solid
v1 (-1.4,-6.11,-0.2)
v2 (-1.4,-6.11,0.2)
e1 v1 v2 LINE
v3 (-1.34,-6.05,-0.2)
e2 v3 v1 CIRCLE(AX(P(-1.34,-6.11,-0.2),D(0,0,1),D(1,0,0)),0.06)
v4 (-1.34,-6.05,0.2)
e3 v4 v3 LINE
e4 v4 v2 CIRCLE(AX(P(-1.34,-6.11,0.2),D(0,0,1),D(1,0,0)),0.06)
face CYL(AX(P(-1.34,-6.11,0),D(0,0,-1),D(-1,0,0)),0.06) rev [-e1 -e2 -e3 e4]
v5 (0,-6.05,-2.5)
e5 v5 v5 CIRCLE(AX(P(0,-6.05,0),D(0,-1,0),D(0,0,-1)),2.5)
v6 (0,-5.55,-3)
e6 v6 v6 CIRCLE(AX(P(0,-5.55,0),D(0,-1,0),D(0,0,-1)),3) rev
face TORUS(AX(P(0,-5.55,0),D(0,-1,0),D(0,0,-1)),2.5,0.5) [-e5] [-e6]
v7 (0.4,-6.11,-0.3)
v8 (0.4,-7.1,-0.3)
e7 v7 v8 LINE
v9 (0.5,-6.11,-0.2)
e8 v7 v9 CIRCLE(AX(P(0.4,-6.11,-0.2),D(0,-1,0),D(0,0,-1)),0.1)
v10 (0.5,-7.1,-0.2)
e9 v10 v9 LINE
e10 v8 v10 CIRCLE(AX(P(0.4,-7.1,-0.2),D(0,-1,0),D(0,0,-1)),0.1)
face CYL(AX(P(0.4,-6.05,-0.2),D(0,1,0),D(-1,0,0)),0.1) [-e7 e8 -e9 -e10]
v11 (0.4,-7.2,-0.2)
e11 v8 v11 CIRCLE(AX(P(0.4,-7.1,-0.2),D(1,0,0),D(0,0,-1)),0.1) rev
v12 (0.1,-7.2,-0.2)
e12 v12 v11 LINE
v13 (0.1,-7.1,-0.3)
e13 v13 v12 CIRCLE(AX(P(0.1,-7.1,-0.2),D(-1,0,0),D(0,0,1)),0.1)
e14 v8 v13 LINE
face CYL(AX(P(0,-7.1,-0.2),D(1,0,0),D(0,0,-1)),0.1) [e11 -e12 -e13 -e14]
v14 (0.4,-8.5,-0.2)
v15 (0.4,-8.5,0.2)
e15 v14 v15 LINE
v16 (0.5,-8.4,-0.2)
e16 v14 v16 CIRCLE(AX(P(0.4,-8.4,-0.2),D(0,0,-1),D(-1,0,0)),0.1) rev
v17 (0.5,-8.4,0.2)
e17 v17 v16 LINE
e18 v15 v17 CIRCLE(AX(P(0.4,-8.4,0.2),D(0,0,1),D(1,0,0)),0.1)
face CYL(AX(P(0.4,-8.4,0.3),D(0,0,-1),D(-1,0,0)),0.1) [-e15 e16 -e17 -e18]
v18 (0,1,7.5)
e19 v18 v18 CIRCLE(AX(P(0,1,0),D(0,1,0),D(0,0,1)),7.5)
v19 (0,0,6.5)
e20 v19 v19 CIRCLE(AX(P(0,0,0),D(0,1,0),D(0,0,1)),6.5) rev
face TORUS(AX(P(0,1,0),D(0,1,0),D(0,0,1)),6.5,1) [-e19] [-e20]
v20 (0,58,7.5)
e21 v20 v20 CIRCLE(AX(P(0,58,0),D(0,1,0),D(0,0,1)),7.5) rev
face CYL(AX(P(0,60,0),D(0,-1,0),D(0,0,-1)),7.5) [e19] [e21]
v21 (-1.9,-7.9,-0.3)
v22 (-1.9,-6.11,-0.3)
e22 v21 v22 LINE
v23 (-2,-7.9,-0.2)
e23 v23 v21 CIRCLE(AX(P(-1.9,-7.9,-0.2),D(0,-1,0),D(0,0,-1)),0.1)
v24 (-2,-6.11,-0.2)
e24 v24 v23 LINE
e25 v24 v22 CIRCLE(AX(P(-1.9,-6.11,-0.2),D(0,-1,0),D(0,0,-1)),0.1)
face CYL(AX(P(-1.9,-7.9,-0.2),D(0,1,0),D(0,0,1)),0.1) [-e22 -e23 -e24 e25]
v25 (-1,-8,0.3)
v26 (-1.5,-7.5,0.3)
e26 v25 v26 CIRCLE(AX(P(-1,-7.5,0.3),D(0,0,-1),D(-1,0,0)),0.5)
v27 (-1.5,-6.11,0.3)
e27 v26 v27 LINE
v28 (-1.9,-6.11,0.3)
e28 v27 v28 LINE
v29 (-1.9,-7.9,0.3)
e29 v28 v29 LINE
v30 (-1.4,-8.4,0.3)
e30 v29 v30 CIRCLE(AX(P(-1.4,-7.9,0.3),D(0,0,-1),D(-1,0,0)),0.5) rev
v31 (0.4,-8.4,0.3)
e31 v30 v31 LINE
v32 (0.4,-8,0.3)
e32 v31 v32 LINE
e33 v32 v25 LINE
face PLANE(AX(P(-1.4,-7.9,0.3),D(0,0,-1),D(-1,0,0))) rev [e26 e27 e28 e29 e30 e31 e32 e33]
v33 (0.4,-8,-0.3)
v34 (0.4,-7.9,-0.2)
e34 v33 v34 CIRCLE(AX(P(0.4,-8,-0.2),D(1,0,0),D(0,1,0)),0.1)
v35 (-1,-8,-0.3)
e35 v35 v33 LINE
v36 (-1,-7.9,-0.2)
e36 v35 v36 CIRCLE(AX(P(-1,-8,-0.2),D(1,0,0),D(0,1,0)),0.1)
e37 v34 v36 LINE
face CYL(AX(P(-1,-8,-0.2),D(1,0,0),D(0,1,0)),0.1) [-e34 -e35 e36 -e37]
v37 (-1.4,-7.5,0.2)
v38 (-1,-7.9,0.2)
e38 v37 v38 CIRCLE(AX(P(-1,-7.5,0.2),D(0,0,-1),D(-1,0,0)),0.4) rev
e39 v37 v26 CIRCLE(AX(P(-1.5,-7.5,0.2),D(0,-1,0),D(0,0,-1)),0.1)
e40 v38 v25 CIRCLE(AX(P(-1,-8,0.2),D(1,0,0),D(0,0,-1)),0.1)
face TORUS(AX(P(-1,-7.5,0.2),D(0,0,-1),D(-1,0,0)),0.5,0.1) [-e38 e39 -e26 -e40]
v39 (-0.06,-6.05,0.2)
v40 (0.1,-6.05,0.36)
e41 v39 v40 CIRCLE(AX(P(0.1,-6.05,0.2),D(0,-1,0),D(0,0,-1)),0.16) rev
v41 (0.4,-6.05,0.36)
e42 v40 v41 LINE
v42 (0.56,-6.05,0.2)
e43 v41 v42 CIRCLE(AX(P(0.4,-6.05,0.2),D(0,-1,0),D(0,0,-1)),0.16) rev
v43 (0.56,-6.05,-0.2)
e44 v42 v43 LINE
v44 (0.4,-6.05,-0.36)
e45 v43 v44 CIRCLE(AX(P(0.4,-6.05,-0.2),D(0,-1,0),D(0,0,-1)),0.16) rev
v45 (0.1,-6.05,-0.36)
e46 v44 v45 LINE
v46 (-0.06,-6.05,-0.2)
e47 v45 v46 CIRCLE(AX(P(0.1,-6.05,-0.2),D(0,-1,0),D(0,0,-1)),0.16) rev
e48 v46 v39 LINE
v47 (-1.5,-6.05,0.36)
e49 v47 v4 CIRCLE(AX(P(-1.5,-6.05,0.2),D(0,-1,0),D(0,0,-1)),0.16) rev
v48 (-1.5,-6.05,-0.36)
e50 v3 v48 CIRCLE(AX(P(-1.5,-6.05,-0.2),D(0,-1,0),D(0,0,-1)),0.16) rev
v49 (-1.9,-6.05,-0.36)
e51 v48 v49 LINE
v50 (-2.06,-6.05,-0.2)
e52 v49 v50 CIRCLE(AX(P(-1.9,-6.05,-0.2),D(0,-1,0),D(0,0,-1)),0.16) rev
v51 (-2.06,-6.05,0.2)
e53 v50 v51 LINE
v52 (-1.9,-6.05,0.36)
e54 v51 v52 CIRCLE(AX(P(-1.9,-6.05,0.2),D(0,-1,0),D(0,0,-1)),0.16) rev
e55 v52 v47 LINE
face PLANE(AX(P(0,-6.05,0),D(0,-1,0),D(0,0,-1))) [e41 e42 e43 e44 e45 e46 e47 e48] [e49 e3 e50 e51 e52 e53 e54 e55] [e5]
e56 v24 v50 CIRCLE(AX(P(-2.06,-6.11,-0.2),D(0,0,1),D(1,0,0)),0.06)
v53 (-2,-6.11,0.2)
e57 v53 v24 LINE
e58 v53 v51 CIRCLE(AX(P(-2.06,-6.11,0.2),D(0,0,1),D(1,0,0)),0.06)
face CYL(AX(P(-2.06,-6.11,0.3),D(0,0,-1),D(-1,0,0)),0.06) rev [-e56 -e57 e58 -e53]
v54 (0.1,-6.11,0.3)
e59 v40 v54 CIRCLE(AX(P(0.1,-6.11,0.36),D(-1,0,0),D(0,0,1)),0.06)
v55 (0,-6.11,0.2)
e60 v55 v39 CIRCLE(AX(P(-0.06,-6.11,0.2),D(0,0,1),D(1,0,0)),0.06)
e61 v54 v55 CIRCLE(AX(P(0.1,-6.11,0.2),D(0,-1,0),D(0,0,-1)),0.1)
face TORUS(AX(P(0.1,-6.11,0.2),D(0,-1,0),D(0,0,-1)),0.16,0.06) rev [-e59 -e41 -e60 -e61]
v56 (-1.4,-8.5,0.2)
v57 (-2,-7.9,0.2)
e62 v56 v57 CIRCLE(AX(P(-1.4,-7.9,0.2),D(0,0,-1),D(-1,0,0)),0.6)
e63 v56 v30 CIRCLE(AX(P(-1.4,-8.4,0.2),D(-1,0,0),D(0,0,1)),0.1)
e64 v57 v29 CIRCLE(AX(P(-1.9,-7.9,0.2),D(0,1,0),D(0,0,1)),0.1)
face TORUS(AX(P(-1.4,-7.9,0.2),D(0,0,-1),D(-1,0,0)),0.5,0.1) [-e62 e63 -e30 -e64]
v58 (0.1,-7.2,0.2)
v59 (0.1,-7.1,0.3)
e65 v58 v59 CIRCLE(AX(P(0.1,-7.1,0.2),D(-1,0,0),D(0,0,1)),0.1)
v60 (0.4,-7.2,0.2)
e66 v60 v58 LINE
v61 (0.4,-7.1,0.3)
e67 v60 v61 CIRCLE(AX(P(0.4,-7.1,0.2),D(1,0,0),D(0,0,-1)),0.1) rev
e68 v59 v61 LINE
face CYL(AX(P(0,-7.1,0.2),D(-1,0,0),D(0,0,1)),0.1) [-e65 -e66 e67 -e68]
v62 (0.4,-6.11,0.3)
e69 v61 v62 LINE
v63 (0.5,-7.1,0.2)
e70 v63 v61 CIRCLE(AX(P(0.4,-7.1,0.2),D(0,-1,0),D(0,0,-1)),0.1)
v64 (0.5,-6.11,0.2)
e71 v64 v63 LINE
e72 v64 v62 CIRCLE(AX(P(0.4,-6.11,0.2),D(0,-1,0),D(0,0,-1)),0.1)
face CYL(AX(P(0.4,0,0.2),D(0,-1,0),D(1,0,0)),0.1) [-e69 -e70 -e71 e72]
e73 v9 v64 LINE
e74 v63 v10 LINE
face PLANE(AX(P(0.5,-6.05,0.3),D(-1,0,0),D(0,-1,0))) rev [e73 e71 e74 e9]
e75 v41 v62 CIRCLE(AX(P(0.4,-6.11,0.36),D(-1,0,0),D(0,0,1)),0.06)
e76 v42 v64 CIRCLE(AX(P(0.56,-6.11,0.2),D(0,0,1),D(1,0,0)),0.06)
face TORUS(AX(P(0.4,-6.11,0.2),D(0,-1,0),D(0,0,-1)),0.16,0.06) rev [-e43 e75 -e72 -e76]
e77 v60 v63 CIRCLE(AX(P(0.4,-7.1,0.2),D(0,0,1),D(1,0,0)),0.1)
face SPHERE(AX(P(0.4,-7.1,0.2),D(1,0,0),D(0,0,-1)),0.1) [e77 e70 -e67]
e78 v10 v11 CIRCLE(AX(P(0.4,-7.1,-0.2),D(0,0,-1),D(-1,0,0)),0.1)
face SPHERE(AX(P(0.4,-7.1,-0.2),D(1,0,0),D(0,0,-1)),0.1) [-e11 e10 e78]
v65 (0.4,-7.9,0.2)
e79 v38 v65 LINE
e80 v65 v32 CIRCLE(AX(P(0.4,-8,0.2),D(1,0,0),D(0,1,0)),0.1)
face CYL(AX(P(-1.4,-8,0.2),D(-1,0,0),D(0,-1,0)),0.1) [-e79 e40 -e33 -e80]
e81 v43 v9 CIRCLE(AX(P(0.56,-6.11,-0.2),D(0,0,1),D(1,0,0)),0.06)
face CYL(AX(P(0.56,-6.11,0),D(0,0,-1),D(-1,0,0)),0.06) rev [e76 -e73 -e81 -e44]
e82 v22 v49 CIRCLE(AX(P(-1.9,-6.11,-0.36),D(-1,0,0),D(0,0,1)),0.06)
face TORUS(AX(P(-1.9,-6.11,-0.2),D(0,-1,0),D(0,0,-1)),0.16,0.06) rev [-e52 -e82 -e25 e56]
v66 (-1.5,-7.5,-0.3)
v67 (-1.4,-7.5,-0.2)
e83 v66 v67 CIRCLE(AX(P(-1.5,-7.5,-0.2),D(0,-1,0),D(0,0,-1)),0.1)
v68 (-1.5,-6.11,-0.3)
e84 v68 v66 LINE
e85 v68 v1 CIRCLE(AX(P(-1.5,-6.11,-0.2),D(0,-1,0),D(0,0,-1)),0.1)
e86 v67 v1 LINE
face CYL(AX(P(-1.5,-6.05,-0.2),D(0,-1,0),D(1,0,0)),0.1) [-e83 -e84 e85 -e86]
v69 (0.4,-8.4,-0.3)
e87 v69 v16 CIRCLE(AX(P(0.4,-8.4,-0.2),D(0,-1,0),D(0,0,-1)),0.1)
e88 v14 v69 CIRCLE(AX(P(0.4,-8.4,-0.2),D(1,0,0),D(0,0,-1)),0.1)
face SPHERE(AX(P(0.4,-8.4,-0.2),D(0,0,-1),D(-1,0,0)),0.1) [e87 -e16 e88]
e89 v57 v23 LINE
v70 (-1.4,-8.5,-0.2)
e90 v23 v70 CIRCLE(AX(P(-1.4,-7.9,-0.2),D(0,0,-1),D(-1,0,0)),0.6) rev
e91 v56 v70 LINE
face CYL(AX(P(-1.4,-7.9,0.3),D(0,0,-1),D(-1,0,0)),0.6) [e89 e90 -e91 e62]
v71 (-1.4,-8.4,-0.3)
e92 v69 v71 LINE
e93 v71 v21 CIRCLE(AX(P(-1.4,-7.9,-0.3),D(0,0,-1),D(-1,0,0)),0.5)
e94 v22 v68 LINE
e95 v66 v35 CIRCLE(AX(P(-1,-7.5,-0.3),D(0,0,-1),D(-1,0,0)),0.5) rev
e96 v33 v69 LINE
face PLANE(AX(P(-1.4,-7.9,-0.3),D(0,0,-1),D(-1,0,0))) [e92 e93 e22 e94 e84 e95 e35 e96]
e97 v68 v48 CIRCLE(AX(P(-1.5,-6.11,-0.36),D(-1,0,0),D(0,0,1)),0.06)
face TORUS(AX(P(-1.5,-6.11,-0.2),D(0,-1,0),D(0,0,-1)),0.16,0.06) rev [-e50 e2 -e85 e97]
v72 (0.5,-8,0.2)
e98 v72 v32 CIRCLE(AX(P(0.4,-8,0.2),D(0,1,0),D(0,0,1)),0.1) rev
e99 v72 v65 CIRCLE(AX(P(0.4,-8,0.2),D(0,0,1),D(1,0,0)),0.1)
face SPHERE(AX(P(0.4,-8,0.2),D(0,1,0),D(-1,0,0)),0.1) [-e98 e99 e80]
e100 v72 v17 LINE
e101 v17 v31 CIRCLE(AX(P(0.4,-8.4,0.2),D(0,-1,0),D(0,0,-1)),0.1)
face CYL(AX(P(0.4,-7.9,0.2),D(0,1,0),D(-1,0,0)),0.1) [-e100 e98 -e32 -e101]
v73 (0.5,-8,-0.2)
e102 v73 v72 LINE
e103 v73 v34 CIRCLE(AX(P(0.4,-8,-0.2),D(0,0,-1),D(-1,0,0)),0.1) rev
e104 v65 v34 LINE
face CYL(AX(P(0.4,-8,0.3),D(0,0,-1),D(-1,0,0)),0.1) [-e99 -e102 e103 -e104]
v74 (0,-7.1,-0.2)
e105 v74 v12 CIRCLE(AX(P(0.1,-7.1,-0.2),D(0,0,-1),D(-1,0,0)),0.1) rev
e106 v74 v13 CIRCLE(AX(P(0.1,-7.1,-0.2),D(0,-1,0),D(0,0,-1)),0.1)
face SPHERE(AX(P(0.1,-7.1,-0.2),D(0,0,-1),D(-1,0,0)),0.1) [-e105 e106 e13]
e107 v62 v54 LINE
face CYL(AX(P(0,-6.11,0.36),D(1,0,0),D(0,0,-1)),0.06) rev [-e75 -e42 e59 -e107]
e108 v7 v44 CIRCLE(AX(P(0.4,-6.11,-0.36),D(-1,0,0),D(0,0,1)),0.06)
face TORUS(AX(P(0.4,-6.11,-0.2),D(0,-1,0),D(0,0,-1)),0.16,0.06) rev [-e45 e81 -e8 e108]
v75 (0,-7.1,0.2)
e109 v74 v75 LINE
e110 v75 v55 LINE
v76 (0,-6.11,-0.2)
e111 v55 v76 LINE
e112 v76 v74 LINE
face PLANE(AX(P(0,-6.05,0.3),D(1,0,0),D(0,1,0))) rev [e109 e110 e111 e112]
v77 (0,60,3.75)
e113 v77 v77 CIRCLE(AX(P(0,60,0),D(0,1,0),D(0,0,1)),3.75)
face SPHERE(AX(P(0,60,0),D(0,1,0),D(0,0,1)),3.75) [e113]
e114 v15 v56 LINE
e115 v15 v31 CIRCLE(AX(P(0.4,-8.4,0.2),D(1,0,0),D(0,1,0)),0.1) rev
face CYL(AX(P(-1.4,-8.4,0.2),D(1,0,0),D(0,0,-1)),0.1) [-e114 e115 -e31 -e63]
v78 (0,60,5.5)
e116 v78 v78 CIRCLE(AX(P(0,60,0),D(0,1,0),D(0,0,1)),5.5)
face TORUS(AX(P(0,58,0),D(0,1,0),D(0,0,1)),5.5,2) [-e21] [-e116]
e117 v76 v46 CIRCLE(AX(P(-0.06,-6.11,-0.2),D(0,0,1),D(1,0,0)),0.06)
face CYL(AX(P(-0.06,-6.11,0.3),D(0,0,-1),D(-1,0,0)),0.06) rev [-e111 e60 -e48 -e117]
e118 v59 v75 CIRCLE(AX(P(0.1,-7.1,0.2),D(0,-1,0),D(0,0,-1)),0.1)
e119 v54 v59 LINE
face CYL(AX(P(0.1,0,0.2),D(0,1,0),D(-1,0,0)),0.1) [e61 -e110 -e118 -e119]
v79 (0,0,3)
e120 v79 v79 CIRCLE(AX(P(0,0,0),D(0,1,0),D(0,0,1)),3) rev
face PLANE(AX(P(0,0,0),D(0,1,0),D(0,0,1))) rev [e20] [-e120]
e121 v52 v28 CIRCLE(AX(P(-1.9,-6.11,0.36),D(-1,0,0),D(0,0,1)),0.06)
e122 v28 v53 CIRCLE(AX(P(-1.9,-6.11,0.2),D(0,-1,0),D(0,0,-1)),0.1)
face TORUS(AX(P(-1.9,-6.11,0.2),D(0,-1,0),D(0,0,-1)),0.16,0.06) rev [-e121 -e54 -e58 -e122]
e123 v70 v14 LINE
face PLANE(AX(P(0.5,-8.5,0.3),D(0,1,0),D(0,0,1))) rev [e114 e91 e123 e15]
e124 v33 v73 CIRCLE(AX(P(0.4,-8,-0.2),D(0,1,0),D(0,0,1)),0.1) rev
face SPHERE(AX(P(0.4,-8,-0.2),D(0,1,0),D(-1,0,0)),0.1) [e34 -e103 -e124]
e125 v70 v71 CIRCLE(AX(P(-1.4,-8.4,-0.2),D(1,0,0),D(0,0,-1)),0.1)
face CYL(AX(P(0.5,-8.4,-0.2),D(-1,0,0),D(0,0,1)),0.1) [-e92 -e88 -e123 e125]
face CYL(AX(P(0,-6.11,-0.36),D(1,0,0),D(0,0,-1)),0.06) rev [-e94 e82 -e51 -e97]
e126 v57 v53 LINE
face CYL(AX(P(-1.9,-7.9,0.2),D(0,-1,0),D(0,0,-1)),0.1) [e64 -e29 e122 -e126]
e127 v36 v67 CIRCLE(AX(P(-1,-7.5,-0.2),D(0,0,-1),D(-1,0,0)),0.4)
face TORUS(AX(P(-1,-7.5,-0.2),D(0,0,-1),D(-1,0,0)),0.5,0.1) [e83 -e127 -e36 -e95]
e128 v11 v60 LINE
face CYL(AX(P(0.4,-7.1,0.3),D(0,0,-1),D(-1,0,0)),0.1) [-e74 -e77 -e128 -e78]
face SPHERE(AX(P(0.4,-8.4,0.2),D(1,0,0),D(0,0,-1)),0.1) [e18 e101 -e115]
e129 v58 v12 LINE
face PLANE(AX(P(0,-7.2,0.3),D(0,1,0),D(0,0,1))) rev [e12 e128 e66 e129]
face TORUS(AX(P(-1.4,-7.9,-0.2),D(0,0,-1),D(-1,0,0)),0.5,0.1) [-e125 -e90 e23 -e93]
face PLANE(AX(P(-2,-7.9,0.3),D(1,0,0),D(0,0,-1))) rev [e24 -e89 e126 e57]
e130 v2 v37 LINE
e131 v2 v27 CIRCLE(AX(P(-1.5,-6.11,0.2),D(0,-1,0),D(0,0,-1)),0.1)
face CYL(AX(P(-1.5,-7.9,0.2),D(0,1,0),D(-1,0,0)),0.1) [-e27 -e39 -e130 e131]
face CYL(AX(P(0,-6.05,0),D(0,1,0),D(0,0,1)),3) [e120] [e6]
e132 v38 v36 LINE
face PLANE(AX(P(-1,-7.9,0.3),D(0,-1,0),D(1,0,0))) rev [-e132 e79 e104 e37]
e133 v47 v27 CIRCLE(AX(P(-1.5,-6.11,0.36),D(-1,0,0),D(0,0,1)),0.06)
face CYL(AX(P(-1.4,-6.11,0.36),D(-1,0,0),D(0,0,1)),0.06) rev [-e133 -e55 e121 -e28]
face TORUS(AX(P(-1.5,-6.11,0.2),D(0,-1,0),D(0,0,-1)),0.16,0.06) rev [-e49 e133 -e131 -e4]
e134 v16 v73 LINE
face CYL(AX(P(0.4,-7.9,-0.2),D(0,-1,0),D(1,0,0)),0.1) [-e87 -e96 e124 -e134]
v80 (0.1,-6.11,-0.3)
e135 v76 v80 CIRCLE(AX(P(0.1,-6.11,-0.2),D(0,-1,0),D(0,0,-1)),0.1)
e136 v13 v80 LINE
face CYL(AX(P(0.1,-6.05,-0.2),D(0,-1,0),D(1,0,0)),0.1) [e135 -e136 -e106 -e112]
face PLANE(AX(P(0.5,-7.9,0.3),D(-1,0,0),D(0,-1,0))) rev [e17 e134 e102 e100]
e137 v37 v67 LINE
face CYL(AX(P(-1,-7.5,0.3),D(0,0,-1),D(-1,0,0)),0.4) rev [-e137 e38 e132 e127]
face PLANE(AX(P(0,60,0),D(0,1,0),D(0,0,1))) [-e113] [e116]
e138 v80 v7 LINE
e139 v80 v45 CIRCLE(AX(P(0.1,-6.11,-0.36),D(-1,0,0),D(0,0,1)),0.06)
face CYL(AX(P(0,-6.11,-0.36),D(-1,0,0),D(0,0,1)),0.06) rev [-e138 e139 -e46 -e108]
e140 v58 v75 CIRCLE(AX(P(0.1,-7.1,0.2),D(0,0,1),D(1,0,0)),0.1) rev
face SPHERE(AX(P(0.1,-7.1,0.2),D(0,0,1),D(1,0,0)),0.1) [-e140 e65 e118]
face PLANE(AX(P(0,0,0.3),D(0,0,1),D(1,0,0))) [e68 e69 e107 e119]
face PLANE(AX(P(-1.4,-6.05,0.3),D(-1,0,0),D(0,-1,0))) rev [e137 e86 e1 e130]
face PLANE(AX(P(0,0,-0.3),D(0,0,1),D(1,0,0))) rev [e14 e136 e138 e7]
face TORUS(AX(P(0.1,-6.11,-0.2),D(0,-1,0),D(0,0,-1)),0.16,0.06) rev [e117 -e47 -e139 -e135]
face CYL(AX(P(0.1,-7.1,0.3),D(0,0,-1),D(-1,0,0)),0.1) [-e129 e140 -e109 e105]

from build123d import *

# Parameters (mm, degrees)
SKETCH1_R           = 7.5
BOSS_EXTRUDE1_DEPTH = 60
SKETCH2_R           = 3.75
BOSS_EXTRUDE2_DEPTH = 3.75
FILLET1_R           = 3.75
FILLET2_R           = 2
FILLET3_R           = 1
SKETCH3_R           = 3
BOSS_EXTRUDE3_DEPTH = 6.05
FILLET4_R           = 0.5
SKETCH4_W           = 0.5
SKETCH4_H           = 1.15
BOSS_EXTRUDE4_DEPTH = 0.3
FILLET5_R           = 0.1
FILLET6_R           = 0.06


with BuildPart() as part:
    # Sketch1 → Boss-Extrude1 (new body)
    with BuildSketch(Plane(origin=(0, 0, 0), x_dir=(1, 0, 0), z_dir=(0, 1, 0))):
        with Locations(Location((0, 0, 0), (0, 0, 270))):
            Circle(SKETCH1_R)
    extrude(amount=BOSS_EXTRUDE1_DEPTH)

    # Sketch2 → Boss-Extrude2 (add)
    with BuildSketch(Plane(origin=(0, 60, 0), x_dir=(1, 0, 0), z_dir=(0, 1, 0))):
        with Locations(Location((0, 0, 0), (0, 0, 270))):
            Circle(SKETCH2_R)
    extrude(amount=BOSS_EXTRUDE2_DEPTH)

    # Fillet1
    fillet1_edges = [part.edges().sort_by_distance(p)[0] for p in [
        (0, 63.75, -3.75),
    ]]
    fillet(fillet1_edges, radius=FILLET1_R - 0.0001)  # a hair under: the kernel refuses the full size

    # Fillet2
    fillet2_edges = [part.edges().sort_by_distance(p)[0] for p in [
        (0, 60, -7.5),
    ]]
    fillet(fillet2_edges, radius=FILLET2_R)

    # Fillet3
    fillet3_edges = [part.edges().sort_by_distance(p)[0] for p in [
        (0, 0, -7.5),
    ]]
    fillet(fillet3_edges, radius=FILLET3_R)

    # Sketch3 → Boss-Extrude3 (add)
    with BuildSketch(Plane.XZ):
        with Locations(Location((0, 0, 0), (0, 0, 90))):
            Circle(SKETCH3_R)
    extrude(amount=BOSS_EXTRUDE3_DEPTH)

    # Fillet4
    fillet4_edges = [part.edges().sort_by_distance(p)[0] for p in [
        (0, -6.05, -3),
    ]]
    fillet(fillet4_edges, radius=FILLET4_R)

    # Sketch4 → Boss-Extrude4 (add, symmetric)
    with BuildSketch(Plane.XY):
        with Locations((0.25, -6.625)):
            Rectangle(SKETCH4_W, SKETCH4_H)
        with BuildLine():
            Line((0.5, -8.5), (-1.4, -8.5))
            ThreePointArc((-1.4, -8.5), (-1.824264069, -8.324264069), (-2, -7.9))
            Line((-2, -7.9), (-2, -6.05))
            Line((-2, -6.05), (-1.4, -6.05))
            Line((-1.4, -6.05), (-1.4, -7.5))
            ThreePointArc((-1.4, -7.5), (-1.282842712, -7.782842712), (-1, -7.9))
            Line((-1, -7.9), (0.5, -7.9))
            Line((0.5, -7.9), (0.5, -8.5))
        make_face()
    extrude(amount=BOSS_EXTRUDE4_DEPTH, both=True)

    # Fillet5
    fillet5_edges = [part.edges().sort_by_distance(p)[0] for p in [
        (0, -6.625, -0.3),
        (0.25, -7.2, -0.3),
        (0, -7.2, 0),
        (0.5, -6.625, -0.3),
        (0.5, -7.2, 0),
        (0, -6.625, 0.3),
        (0.25, -7.2, 0.3),
        (0.5, -6.625, 0.3),
        (-1.824264069, -8.324264069, -0.3),
        (-0.45, -8.5, -0.3),
        (0.5, -8.2, -0.3),
        (0.5, -8.5, 0),
        (-0.25, -7.9, -0.3),
        (0.5, -7.9, 0),
        (-1.282842712, -7.782842712, -0.3),
        (-1.4, -6.775, -0.3),
        (-2, -6.975, -0.3),
        (-1.824264069, -8.324264069, 0.3),
        (-0.45, -8.5, 0.3),
        (0.5, -8.2, 0.3),
        (-0.25, -7.9, 0.3),
        (-1.282842712, -7.782842712, 0.3),
        (-1.4, -6.775, 0.3),
        (-2, -6.975, 0.3),
    ]]
    fillet(fillet5_edges, radius=FILLET5_R)

    # Fillet6
    fillet6_edges = [part.edges().sort_by_distance(p)[0] for p in [
        (-1.7, -6.05, 0.3),
        (-2, -6.05, 0),
        (-1.7, -6.05, -0.3),
        (0, -6.05, 0),
        (0.25, -6.05, 0.3),
        (0.5, -6.05, 0),
        (0.25, -6.05, -0.3),
        (-1.4, -6.05, 0),
        (-1.970710678, -6.05, 0.270710678),
        (-1.970710678, -6.05, -0.270710678),
        (0.029289322, -6.05, -0.270710678),
        (0.029289322, -6.05, 0.270710678),
        (0.470710678, -6.05, -0.270710678),
        (0.470710678, -6.05, 0.270710678),
        (-1.429289322, -6.05, -0.270710678),
        (-1.429289322, -6.05, 0.270710678),
    ]]
    fillet(fillet6_edges, radius=FILLET6_R)


solid = part.part
